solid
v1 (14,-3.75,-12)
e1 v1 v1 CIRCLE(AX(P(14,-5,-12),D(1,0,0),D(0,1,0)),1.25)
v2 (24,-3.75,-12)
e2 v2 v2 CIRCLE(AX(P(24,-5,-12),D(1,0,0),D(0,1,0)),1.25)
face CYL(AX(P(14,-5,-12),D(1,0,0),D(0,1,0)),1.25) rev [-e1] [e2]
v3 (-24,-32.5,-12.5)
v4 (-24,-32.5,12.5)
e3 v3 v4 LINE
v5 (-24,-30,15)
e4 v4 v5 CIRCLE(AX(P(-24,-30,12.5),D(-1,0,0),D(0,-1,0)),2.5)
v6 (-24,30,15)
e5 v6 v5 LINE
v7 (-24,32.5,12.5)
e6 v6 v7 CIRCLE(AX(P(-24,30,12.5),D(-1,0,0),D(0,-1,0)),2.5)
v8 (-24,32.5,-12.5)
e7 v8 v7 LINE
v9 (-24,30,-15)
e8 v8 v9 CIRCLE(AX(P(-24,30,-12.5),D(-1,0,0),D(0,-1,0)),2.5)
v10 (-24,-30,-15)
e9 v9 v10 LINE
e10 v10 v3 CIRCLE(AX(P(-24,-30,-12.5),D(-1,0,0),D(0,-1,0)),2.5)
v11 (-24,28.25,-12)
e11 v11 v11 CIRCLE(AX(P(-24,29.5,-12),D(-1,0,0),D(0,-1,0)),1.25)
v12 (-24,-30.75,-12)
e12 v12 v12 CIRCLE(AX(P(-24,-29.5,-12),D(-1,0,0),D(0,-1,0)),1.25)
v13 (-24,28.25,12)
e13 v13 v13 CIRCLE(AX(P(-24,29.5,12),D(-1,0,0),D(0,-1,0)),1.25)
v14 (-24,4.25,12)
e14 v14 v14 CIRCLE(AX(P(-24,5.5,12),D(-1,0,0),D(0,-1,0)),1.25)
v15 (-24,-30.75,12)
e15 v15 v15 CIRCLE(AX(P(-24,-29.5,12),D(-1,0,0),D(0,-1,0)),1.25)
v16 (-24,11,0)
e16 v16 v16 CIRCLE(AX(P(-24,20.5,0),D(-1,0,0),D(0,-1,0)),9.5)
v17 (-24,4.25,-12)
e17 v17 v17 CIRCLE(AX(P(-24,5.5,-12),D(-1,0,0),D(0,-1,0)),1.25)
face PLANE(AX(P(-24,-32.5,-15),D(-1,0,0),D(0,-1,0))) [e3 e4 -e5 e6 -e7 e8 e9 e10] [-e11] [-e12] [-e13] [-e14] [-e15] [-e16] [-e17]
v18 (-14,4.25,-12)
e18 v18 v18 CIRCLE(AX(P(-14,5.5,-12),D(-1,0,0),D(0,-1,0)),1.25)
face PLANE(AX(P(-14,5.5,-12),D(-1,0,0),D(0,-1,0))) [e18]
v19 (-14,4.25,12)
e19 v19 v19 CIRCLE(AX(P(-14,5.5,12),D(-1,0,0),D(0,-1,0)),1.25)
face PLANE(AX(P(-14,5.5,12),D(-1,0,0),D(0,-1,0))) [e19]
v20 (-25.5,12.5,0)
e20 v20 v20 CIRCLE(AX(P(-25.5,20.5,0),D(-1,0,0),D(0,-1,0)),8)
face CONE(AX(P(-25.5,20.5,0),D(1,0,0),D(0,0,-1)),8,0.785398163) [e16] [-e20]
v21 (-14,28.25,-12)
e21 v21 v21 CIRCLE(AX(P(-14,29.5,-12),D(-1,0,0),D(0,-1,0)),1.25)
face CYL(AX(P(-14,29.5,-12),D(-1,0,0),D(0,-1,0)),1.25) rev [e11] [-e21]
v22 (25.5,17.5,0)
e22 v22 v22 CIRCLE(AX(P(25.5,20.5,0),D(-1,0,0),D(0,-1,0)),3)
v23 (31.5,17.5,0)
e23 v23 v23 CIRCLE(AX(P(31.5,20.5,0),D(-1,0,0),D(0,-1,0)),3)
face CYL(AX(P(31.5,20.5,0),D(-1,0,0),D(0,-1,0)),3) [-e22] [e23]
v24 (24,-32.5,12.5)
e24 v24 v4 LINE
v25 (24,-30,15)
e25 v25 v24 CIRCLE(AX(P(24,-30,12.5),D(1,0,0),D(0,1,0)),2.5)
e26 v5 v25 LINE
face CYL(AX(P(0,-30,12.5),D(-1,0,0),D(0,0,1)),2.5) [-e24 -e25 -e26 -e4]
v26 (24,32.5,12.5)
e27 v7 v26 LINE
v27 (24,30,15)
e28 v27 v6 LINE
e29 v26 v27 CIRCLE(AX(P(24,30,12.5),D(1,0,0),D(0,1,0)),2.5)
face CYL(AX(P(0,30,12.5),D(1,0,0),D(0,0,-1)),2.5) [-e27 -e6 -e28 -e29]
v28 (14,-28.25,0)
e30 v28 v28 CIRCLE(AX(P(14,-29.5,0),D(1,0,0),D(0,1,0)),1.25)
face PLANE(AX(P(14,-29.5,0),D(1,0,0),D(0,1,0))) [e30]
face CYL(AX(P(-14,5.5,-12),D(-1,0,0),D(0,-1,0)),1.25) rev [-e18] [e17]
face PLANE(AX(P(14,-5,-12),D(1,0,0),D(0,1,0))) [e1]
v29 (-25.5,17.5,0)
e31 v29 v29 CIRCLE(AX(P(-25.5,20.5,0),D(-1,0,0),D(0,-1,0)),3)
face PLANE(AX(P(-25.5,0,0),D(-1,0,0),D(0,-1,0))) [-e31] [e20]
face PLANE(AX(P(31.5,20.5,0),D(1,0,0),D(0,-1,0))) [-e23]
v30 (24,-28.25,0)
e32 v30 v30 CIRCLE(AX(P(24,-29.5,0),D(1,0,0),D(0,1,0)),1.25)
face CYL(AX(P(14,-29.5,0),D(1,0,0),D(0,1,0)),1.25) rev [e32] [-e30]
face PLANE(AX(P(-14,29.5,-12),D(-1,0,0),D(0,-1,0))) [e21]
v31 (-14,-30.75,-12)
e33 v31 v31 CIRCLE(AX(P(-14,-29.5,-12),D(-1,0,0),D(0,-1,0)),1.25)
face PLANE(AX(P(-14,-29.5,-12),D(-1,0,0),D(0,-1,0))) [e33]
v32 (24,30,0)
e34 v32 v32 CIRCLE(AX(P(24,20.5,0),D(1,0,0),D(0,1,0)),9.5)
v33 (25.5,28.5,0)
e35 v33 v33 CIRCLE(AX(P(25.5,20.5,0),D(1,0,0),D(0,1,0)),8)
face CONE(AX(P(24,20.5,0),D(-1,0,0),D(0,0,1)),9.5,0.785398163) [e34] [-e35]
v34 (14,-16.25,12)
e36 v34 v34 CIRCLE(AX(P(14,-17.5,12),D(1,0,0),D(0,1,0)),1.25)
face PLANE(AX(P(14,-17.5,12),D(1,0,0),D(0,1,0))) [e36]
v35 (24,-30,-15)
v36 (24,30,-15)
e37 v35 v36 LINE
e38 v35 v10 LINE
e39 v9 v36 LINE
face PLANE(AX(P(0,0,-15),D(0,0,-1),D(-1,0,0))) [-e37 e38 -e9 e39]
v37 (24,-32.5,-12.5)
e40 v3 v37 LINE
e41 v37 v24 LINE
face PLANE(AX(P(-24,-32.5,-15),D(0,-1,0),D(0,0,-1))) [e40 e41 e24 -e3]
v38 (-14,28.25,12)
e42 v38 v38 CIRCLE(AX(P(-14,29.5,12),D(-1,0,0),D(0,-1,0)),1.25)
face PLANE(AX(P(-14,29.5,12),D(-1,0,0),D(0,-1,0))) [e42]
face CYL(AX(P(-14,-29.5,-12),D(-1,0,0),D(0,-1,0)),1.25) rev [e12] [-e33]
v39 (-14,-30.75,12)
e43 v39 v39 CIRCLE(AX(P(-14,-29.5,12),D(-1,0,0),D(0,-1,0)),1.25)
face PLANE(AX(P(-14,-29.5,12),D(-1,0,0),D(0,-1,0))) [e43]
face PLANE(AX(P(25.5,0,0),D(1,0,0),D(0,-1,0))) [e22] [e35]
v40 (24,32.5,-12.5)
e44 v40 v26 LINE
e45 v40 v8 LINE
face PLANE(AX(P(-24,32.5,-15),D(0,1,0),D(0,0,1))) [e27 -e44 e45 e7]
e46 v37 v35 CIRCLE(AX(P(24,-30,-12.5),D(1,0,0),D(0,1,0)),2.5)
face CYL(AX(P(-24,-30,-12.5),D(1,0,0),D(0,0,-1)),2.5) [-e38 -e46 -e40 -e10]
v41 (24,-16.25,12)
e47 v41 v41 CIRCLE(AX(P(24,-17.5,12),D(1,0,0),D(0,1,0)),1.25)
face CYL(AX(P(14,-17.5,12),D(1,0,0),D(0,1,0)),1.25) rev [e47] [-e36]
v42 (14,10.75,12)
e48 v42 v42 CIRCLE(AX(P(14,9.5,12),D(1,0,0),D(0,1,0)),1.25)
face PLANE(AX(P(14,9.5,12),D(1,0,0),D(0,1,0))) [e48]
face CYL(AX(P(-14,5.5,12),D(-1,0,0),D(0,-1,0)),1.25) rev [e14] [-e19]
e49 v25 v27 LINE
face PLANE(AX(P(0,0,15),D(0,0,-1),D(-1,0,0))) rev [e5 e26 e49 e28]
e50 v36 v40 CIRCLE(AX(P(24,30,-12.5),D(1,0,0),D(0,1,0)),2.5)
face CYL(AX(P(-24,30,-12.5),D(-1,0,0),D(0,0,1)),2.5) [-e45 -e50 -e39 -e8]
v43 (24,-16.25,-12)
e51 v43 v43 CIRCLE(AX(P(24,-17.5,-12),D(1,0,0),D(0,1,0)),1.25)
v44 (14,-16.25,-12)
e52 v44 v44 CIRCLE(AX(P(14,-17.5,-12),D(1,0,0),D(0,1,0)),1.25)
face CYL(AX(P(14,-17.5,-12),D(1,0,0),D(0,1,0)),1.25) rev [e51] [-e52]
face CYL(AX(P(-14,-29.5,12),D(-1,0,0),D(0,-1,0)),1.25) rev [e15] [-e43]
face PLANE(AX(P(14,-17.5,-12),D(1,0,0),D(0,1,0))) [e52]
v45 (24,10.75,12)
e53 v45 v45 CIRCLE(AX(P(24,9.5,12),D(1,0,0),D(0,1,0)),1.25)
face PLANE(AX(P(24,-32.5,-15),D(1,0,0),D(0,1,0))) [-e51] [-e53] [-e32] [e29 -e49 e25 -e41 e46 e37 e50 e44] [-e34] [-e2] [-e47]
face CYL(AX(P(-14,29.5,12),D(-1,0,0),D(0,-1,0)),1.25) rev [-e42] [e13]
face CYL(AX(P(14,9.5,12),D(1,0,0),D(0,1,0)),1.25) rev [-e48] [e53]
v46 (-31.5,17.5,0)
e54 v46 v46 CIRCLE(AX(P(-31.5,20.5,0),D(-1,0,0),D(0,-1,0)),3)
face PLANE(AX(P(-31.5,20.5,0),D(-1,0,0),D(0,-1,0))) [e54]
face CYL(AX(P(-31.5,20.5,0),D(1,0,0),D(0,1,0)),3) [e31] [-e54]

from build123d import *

# Parameters (mm, degrees)
BOSS_EXTRUDE1_DEPTH      = 15
BOSS_EXTRUDE1_DEPTH_BACK = 15
SKETCH1_W                = 48
SKETCH1_H                = 65
SKETCH2_R                = 1.25
CUT_EXTRUDE1_DEPTH       = 10
SKETCH4_R                = 9.5
SKETCH4_R_2              = 8
SKETCH4_R_3              = 3
BOSS_EXTRUDE3_DEPTH      = 1.5
CHAMFER2_SIZE            = 1.5
SKETCH5_R                = 3
BOSS_EXTRUDE4_DEPTH      = 6
CHAMFER2_OF_MIRROR1_SIZE = 1.5
SKETCH6_R                = 1.25
SKETCH6_R_2              = 1.249999994
CUT_EXTRUDE2_DEPTH       = 10
FILLET1_R                = 2.5


with BuildPart() as part:
    # Sketch1 → Boss-Extrude1 (new, two sides: drawn at the far end of the back side and taken through both)
    with BuildSketch(Plane.XY.offset(-BOSS_EXTRUDE1_DEPTH_BACK)):
        Rectangle(SKETCH1_W, SKETCH1_H)
    extrude(amount=BOSS_EXTRUDE1_DEPTH + BOSS_EXTRUDE1_DEPTH_BACK)

    # Sketch2 → Cut-Extrude1 (cut)
    with BuildSketch(Plane.ZY.offset(24)):
        with Locations(Location((-12, 29.5, 0), (0, 0, 270))):
            Circle(SKETCH2_R)
        with Locations(Location((12, 29.5, 0), (0, 0, 270))):
            Circle(SKETCH2_R)
        with Locations(Location((12, 5.5, 0), (0, 0, 270))):
            Circle(SKETCH2_R)
        with Locations(Location((-12, 5.5, 0), (0, 0, 270))):
            Circle(SKETCH2_R)
        with Locations(Location((-12, -29.5, 0), (0, 0, 270))):
            Circle(SKETCH2_R)
        with Locations(Location((12, -29.5, 0), (0, 0, 270))):
            Circle(SKETCH2_R)
    extrude(amount=-CUT_EXTRUDE1_DEPTH, mode=Mode.SUBTRACT)

    # Sketch4 → Boss-Extrude3 (add)
    # profile 1 of 3: a face of its own
    with BuildSketch(Plane.ZY.offset(24)):
        with Locations(Location((0, 20.5, 0), (0, 0, 270))):
            Circle(SKETCH4_R)
        with Locations((0, 20.5)):
            Circle(SKETCH4_R_2, mode=Mode.SUBTRACT)
    # profile 2 of 3: a face of its own
    with BuildSketch(Plane.ZY.offset(24)):
        with Locations((0, 20.5)):
            Circle(SKETCH4_R_2)
        with Locations((0, 20.5)):
            Circle(SKETCH4_R_3, mode=Mode.SUBTRACT)
    # profile 3 of 3: a face of its own
    with BuildSketch(Plane.ZY.offset(24)):
        with Locations((0, 20.5)):
            Circle(SKETCH4_R_3)
    boss_extrude3 = extrude(amount=BOSS_EXTRUDE3_DEPTH)

    # Chamfer2
    chamfer2_edges = [part.edges().sort_by_distance(p)[0] for p in [
        (-25.5, 30, 0),
    ]]
    chamfer(chamfer2_edges, length=CHAMFER2_SIZE - 0.0001)  # a hair under: the kernel refuses the full size

    # Sketch5 → Boss-Extrude4 (add)
    with BuildSketch(Plane.ZY.offset(25.5)):
        with Locations(Location((0, 20.5, 0), (0, 0, 270))):
            Circle(SKETCH5_R)
    boss_extrude4 = extrude(amount=BOSS_EXTRUDE4_DEPTH)

    # Mirror1: Boss-Extrude3, Boss-Extrude4 across plane
    add(boss_extrude3.mirror(Plane(origin=(0, 0, 0), x_dir=(0, 0, 1), z_dir=(1, 0, 0))))
    add(boss_extrude4.mirror(Plane(origin=(0, 0, 0), x_dir=(0, 0, 1), z_dir=(1, 0, 0))))

    # Chamfer2 of Mirror1
    chamfer2_of_mirror1_edges = [part.edges().sort_by_distance(p)[0] for p in [
        (25.5, 30, 0),
    ]]
    chamfer(chamfer2_of_mirror1_edges, length=CHAMFER2_OF_MIRROR1_SIZE - 0.0001)  # a hair under: the kernel refuses the full size

    # Sketch6 → Cut-Extrude2 (cut)
    with BuildSketch(Plane(origin=(24, 0, 0), x_dir=(0, 0, -1), z_dir=(1, 0, 0))):
        with Locations(Location((11.99999998, -5, 0), (0, 0, 90))):
            Circle(SKETCH6_R)
        with Locations(Location((12.00000002, -17.5, 0), (0, 0, 90))):
            Circle(SKETCH6_R)
        with Locations(Location((0, -29.5, 0), (0, 0, 90))):
            Circle(SKETCH6_R_2)
        with Locations(Location((-12.00000002, -17.5, 0), (0, 0, 90))):
            Circle(SKETCH6_R)
        with Locations(Location((-12.00000002, 9.5, 0), (0, 0, 90))):
            Circle(SKETCH6_R)
    extrude(amount=-CUT_EXTRUDE2_DEPTH, mode=Mode.SUBTRACT)

    # Fillet1
    fillet1_edges = [part.edges().sort_by_distance(p)[0] for p in [
        (0, -32.5, 15),
        (0, 32.5, 15),
        (0, 32.5, -15),
        (0, -32.5, -15),
    ]]
    fillet(fillet1_edges, radius=FILLET1_R)


solid = part.part
